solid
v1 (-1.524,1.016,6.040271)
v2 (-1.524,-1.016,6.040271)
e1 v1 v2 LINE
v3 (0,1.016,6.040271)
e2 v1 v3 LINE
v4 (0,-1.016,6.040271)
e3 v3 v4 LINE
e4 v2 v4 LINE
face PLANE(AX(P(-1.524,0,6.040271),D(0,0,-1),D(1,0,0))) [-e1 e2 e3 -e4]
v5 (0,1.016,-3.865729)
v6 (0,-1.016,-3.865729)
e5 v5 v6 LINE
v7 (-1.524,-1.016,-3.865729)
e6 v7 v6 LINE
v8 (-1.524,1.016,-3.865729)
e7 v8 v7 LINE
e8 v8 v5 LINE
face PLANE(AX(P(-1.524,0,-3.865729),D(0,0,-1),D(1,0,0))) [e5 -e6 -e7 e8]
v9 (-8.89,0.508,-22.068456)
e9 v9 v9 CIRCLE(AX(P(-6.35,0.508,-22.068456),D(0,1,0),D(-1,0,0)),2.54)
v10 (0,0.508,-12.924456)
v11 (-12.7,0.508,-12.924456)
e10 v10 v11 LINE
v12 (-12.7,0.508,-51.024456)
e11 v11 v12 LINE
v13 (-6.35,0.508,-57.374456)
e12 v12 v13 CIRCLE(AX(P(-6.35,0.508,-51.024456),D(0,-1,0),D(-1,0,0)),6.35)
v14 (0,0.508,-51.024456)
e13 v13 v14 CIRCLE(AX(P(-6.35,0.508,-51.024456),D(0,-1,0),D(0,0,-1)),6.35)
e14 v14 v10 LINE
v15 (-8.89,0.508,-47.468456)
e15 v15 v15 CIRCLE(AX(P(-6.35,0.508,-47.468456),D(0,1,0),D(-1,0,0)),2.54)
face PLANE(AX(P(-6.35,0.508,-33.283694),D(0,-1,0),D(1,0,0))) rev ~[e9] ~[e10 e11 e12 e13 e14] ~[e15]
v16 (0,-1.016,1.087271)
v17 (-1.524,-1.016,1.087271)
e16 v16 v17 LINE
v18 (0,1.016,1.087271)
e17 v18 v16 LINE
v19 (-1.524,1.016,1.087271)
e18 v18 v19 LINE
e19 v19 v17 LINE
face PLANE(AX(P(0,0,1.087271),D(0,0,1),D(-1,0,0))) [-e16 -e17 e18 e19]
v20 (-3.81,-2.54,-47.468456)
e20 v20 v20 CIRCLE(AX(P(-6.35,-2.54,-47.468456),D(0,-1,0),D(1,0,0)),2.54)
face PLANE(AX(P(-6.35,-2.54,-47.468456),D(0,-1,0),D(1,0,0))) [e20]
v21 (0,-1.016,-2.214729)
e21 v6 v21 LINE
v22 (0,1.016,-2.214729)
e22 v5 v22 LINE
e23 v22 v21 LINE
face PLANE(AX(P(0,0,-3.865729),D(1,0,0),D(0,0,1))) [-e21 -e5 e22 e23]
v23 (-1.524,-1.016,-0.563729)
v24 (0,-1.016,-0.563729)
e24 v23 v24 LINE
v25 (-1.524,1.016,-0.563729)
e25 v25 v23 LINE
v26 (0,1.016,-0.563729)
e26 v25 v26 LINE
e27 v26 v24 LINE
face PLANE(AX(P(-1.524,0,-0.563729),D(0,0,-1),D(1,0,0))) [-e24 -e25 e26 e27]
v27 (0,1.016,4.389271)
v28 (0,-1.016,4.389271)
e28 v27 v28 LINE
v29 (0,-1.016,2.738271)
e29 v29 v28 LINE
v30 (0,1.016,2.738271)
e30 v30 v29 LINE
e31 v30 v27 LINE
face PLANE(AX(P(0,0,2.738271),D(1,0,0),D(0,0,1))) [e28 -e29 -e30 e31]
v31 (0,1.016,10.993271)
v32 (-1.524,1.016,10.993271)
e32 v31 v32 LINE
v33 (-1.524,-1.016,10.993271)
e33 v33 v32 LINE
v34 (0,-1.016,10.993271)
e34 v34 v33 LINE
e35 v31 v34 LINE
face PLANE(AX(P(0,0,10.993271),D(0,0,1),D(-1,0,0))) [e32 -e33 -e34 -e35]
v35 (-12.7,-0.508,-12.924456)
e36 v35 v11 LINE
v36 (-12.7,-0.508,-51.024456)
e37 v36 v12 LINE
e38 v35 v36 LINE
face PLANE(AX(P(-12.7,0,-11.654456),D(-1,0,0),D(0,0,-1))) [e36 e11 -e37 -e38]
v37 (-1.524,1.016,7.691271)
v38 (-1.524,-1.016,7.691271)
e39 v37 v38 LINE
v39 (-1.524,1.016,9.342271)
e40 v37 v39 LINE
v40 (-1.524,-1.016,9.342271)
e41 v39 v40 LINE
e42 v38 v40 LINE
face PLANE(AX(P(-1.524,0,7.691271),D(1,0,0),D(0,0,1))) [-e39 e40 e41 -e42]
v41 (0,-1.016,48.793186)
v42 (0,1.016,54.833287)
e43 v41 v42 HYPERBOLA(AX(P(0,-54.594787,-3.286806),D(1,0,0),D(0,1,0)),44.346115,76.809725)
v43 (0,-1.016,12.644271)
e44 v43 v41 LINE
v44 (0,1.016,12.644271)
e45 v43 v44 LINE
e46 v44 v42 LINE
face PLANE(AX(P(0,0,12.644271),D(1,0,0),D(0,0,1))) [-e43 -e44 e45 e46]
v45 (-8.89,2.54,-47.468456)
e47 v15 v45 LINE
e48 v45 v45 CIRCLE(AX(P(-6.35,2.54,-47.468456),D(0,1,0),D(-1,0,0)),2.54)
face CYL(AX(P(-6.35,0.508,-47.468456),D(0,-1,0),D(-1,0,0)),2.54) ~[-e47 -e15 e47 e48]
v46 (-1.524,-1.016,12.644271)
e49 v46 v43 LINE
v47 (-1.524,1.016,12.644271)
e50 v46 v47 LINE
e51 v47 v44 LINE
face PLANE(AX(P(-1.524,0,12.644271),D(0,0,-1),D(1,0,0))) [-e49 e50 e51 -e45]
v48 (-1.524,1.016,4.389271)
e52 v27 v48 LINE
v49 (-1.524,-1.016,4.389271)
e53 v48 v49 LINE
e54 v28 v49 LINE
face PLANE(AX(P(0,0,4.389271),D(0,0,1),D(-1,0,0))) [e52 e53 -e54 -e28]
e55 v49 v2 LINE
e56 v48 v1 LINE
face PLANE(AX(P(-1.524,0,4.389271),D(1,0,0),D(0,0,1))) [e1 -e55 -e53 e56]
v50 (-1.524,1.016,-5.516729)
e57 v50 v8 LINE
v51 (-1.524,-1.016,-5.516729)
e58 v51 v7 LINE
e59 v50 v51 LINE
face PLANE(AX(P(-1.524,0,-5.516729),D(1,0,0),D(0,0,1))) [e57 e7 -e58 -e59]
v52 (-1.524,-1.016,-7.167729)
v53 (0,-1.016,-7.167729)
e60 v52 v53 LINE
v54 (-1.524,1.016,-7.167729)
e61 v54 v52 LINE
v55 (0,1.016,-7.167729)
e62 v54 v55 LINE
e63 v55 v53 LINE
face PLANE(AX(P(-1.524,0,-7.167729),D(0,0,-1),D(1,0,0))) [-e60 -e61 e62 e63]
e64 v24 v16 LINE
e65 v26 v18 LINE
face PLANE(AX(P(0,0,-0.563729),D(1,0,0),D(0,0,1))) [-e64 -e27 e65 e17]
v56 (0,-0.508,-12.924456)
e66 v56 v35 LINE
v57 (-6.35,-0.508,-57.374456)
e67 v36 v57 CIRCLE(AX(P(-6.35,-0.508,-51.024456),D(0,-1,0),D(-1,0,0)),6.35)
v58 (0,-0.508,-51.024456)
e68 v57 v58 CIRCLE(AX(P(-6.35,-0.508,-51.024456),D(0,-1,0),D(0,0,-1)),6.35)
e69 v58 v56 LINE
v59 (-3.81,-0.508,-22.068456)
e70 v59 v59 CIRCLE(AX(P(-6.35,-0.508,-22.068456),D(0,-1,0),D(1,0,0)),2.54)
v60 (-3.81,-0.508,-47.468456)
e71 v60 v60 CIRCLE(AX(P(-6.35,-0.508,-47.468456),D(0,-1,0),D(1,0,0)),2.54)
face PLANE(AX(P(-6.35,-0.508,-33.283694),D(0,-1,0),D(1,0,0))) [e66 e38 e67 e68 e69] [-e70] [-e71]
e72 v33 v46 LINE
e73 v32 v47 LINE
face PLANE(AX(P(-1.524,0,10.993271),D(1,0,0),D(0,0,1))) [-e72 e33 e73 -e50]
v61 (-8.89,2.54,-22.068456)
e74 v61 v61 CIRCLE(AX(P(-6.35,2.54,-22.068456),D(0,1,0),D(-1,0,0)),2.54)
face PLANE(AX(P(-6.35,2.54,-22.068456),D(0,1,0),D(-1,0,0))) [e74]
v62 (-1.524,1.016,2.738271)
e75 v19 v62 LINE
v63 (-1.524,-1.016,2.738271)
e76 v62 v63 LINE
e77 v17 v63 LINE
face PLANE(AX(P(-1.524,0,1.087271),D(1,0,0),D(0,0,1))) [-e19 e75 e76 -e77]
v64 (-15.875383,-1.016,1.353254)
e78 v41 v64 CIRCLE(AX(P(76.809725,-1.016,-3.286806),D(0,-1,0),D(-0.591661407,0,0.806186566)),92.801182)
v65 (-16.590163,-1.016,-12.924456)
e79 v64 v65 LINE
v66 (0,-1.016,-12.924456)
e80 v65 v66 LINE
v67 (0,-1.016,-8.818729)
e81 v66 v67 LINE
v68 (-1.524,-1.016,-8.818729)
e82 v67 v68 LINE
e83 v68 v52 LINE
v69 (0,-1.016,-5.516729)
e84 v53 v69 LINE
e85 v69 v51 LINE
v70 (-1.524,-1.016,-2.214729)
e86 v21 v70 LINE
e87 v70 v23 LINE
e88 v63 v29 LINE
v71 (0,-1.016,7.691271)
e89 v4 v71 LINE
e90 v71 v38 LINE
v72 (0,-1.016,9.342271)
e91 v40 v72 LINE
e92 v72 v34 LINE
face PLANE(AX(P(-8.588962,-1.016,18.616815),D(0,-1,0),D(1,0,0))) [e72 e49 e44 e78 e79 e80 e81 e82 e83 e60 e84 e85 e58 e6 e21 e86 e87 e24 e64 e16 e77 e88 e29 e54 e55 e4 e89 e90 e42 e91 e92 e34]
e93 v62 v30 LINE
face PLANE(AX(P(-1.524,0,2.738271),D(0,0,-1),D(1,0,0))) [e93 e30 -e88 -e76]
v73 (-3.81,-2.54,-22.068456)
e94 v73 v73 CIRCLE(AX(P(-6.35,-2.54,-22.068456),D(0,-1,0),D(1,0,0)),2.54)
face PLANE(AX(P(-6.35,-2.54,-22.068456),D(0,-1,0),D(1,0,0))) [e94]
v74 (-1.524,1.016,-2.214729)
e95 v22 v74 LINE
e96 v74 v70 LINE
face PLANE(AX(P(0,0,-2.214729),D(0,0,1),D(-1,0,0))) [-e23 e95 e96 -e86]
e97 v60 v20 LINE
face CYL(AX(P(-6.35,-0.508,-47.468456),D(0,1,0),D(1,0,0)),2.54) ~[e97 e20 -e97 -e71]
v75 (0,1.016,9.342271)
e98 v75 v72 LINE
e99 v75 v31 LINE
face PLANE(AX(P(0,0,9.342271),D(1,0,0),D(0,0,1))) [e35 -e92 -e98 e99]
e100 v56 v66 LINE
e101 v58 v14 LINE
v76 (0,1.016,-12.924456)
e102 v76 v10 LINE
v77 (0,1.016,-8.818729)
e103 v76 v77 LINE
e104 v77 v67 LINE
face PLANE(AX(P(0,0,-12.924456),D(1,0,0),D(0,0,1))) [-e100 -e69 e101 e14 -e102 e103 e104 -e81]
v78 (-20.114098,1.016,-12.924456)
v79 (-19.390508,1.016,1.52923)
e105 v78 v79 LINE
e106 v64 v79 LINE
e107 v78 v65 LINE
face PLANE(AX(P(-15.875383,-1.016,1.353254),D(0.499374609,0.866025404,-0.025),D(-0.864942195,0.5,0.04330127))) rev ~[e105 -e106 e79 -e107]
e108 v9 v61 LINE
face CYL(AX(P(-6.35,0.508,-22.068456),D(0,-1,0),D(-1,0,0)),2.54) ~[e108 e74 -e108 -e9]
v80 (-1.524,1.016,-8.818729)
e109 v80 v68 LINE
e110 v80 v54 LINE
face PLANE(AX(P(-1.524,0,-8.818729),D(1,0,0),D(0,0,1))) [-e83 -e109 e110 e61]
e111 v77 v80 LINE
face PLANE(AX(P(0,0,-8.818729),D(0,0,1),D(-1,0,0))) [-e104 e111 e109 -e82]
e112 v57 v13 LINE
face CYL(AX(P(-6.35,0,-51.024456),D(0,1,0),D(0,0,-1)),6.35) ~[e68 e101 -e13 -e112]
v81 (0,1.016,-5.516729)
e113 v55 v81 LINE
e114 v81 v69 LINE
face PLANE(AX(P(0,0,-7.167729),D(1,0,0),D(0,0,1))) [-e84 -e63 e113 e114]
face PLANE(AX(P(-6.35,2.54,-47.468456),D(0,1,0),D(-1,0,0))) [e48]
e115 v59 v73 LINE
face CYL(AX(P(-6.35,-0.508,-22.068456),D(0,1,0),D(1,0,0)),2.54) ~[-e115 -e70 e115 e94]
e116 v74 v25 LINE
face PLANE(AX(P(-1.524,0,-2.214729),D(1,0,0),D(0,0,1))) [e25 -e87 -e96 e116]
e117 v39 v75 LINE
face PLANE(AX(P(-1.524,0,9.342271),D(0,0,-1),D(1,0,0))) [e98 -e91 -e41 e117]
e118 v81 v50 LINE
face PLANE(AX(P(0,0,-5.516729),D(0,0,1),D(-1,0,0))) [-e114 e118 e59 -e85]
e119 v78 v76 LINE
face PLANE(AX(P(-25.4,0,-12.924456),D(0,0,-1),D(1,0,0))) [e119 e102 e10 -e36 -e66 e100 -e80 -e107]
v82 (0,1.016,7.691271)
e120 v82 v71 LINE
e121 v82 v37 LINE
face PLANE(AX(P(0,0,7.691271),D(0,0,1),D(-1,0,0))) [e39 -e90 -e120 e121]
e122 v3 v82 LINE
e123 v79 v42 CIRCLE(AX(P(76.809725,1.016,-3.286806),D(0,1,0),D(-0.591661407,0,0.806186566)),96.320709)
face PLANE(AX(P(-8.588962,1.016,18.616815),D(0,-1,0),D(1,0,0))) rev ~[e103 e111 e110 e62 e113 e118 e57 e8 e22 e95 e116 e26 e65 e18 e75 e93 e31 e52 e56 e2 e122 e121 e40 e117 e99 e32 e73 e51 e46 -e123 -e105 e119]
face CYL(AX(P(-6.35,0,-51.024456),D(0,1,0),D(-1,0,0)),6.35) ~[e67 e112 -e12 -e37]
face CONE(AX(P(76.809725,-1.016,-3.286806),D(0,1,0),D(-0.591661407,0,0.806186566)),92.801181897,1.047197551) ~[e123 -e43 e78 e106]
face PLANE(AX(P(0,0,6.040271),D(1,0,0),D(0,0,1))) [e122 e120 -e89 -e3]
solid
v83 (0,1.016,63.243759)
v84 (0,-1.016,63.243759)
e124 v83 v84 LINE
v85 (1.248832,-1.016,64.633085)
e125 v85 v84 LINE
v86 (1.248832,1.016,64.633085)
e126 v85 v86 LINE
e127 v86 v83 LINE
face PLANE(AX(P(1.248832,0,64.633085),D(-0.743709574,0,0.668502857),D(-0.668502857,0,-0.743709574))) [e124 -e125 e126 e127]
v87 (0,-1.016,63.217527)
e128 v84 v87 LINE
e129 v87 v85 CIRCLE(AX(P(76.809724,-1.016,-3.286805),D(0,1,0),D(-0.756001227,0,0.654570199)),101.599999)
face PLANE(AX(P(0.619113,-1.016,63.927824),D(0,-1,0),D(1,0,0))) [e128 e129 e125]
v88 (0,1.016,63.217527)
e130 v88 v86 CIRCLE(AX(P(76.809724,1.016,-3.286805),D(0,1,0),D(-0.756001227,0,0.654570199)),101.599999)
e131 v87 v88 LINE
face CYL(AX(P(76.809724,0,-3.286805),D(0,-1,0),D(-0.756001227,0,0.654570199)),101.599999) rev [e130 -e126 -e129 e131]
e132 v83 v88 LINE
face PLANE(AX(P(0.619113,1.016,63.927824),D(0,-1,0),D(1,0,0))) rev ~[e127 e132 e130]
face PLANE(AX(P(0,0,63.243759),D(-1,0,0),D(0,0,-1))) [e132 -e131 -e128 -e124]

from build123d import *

# Parameters (mm, degrees)
F1_DEPTH    = 1.016
F3_DEPTH    = 0.508
F4_R        = 2.54
F5_DEPTH    = 2.032
F6_R        = 2.54
F7_DEPTH    = 2.032
F8_T1_DEPTH = 37.4993793655
F8_T4_ANGLE = 50.8590204833


# Not quite as in the source:
# - a fillet or chamfer that OpenCascade refuses, or shapes differently, is made with other operations: its cross-section is extruded or revolved along the edge and cut away or added


with BuildPart() as f1:
    # F0 (on Front) → F1 (new body, symmetric)
    with BuildSketch(Plane.XZ):
        with BuildLine():
            Line((1.2488319587, 64.6330847304), (0, 63.2437589053))
            Line((0, 63.2437589053), (0, 63.2175266339))
            ThreePointArc((0, 63.2175266339), (0.6211283352, 63.9282061037), (1.2488319587, 64.6330847304))
        make_face()
    extrude(amount=F1_DEPTH, both=True)


with BuildPart() as f1b:
    # F0 (on Front) → F1, piece 2 (new body, symmetric)
    with BuildSketch(Plane.XZ):
        with BuildLine():
            Line((0, 12.6442711507), (0, 63.2175266339))
            ThreePointArc((0, 63.2175266339), (-17.4739565434, 34.5701285719), (-24.6631958803, 1.793194445))
            Line((-24.6631958803, 1.793194445), (-25.4, -12.92445632))
            Line((-25.4, -12.92445632), (-20.955, -12.92445632))
            Line((-20.955, -12.92445632), (-4.445, -12.92445632))
            Line((-4.445, -12.92445632), (0, -12.92445632))
            Line((0, -12.92445632), (0, -8.8187288493))
            Line((0, -8.8187288493), (-1.524, -8.8187288493))
            Line((-1.524, -8.8187288493), (-1.524, -7.1677288493))
            Line((-1.524, -7.1677288493), (0, -7.1677288493))
            Line((0, -7.1677288493), (0, -5.5167288493))
            Line((0, -5.5167288493), (-1.524, -5.5167288493))
            Line((-1.524, -5.5167288493), (-1.524, -3.8657288493))
            Line((-1.524, -3.8657288493), (0, -3.8657288493))
            Line((0, -3.8657288493), (0, -2.2147288493))
            Line((0, -2.2147288493), (-1.524, -2.2147288493))
            Line((-1.524, -2.2147288493), (-1.524, -0.5637288493))
            Line((-1.524, -0.5637288493), (0, -0.5637288493))
            Line((0, -0.5637288493), (0, 1.0872711507))
            Line((0, 1.0872711507), (-1.524, 1.0872711507))
            Line((-1.524, 1.0872711507), (-1.524, 2.7382711507))
            Line((-1.524, 2.7382711507), (0, 2.7382711507))
            Line((0, 2.7382711507), (0, 4.3892711507))
            Line((0, 4.3892711507), (-1.524, 4.3892711507))
            Line((-1.524, 4.3892711507), (-1.524, 6.0402711507))
            Line((-1.524, 6.0402711507), (0, 6.0402711507))
            Line((0, 6.0402711507), (0, 7.6912711507))
            Line((0, 7.6912711507), (-1.524, 7.6912711507))
            Line((-1.524, 7.6912711507), (-1.524, 9.3422711507))
            Line((-1.524, 9.3422711507), (0, 9.3422711507))
            Line((0, 9.3422711507), (0, 10.9932711507))
            Line((0, 10.9932711507), (-1.524, 10.9932711507))
            Line((-1.524, 10.9932711507), (-1.524, 12.6442711507))
            Line((-1.524, 12.6442711507), (0, 12.6442711507))
        make_face()
    extrude(amount=F1_DEPTH, both=True)

    # F2 (on Front) → F3 (join, symmetric)
    with BuildSketch(Plane.XZ):
        with BuildLine():
            Line((0, -11.65445632), (-12.7, -11.65445632))
            Line((-12.7, -11.65445632), (-12.7, -51.02445632))
            ThreePointArc((-12.7, -51.02445632), (-10.8401280605, -55.5145843805), (-6.35, -57.37445632))
            ThreePointArc((-6.35, -57.37445632), (-1.8598719395, -55.5145843805), (0, -51.02445632))
            Line((0, -51.02445632), (0, -11.65445632))
        make_face()
    extrude(amount=F3_DEPTH, both=True)

    # F4 (on face) → F5 (join)
    with BuildSketch(Plane.XZ.offset(0.508)):
        with Locations((-6.35, -22.06845632)):
            Circle(F4_R)
        with Locations((-6.35, -47.46845632)):
            Circle(F4_R)
    extrude(amount=F5_DEPTH)

    # F6 (on face) → F7 (join)
    with BuildSketch(Plane(origin=(0, 0.508, 0), x_dir=(-1, 0, 0), z_dir=(0, 1, 0))):
        with Locations((6.35, -47.46845632)):
            Circle(F6_R)
        with Locations((6.35, -22.06845632)):
            Circle(F6_R)
    extrude(amount=F7_DEPTH)

    # F8: chamfer of 5.08 x 8.7988181024 on 1 edges, made by hand

    # F8_s2 → F8_t1 (cut)
    with BuildSketch(Plane(origin=(0.0278895878, 0, 0.5570940792), x_dir=(0, 1, 0), z_dir=(-0.05, 0, -0.9987492178))):
        Polygon((-1.016, -15.923189213), (4.064, -24.7220073154), (-1.016, -24.7220073154), align=None)
    extrude(amount=F8_T1_DEPTH, mode=Mode.SUBTRACT)

    # F8_s3 → F8_t4 (revolve, cut)
    with BuildSketch(Plane(origin=(48.3536933956, 0, 35.4868407309), x_dir=(0, 1, 0), z_dir=(0.8061865661, 0, 0.5916614071))):
        Polygon((-1.016, 44.7060536536), (4.064, 53.5048717561), (-1.016, 53.5048717561), align=None)
    revolve(axis=Axis((76.8097246454, -1.016, -3.286805555), (0, -1, 0)), revolution_arc=F8_T4_ANGLE, mode=Mode.SUBTRACT)


solid = Compound([f1.part, f1b.part])
